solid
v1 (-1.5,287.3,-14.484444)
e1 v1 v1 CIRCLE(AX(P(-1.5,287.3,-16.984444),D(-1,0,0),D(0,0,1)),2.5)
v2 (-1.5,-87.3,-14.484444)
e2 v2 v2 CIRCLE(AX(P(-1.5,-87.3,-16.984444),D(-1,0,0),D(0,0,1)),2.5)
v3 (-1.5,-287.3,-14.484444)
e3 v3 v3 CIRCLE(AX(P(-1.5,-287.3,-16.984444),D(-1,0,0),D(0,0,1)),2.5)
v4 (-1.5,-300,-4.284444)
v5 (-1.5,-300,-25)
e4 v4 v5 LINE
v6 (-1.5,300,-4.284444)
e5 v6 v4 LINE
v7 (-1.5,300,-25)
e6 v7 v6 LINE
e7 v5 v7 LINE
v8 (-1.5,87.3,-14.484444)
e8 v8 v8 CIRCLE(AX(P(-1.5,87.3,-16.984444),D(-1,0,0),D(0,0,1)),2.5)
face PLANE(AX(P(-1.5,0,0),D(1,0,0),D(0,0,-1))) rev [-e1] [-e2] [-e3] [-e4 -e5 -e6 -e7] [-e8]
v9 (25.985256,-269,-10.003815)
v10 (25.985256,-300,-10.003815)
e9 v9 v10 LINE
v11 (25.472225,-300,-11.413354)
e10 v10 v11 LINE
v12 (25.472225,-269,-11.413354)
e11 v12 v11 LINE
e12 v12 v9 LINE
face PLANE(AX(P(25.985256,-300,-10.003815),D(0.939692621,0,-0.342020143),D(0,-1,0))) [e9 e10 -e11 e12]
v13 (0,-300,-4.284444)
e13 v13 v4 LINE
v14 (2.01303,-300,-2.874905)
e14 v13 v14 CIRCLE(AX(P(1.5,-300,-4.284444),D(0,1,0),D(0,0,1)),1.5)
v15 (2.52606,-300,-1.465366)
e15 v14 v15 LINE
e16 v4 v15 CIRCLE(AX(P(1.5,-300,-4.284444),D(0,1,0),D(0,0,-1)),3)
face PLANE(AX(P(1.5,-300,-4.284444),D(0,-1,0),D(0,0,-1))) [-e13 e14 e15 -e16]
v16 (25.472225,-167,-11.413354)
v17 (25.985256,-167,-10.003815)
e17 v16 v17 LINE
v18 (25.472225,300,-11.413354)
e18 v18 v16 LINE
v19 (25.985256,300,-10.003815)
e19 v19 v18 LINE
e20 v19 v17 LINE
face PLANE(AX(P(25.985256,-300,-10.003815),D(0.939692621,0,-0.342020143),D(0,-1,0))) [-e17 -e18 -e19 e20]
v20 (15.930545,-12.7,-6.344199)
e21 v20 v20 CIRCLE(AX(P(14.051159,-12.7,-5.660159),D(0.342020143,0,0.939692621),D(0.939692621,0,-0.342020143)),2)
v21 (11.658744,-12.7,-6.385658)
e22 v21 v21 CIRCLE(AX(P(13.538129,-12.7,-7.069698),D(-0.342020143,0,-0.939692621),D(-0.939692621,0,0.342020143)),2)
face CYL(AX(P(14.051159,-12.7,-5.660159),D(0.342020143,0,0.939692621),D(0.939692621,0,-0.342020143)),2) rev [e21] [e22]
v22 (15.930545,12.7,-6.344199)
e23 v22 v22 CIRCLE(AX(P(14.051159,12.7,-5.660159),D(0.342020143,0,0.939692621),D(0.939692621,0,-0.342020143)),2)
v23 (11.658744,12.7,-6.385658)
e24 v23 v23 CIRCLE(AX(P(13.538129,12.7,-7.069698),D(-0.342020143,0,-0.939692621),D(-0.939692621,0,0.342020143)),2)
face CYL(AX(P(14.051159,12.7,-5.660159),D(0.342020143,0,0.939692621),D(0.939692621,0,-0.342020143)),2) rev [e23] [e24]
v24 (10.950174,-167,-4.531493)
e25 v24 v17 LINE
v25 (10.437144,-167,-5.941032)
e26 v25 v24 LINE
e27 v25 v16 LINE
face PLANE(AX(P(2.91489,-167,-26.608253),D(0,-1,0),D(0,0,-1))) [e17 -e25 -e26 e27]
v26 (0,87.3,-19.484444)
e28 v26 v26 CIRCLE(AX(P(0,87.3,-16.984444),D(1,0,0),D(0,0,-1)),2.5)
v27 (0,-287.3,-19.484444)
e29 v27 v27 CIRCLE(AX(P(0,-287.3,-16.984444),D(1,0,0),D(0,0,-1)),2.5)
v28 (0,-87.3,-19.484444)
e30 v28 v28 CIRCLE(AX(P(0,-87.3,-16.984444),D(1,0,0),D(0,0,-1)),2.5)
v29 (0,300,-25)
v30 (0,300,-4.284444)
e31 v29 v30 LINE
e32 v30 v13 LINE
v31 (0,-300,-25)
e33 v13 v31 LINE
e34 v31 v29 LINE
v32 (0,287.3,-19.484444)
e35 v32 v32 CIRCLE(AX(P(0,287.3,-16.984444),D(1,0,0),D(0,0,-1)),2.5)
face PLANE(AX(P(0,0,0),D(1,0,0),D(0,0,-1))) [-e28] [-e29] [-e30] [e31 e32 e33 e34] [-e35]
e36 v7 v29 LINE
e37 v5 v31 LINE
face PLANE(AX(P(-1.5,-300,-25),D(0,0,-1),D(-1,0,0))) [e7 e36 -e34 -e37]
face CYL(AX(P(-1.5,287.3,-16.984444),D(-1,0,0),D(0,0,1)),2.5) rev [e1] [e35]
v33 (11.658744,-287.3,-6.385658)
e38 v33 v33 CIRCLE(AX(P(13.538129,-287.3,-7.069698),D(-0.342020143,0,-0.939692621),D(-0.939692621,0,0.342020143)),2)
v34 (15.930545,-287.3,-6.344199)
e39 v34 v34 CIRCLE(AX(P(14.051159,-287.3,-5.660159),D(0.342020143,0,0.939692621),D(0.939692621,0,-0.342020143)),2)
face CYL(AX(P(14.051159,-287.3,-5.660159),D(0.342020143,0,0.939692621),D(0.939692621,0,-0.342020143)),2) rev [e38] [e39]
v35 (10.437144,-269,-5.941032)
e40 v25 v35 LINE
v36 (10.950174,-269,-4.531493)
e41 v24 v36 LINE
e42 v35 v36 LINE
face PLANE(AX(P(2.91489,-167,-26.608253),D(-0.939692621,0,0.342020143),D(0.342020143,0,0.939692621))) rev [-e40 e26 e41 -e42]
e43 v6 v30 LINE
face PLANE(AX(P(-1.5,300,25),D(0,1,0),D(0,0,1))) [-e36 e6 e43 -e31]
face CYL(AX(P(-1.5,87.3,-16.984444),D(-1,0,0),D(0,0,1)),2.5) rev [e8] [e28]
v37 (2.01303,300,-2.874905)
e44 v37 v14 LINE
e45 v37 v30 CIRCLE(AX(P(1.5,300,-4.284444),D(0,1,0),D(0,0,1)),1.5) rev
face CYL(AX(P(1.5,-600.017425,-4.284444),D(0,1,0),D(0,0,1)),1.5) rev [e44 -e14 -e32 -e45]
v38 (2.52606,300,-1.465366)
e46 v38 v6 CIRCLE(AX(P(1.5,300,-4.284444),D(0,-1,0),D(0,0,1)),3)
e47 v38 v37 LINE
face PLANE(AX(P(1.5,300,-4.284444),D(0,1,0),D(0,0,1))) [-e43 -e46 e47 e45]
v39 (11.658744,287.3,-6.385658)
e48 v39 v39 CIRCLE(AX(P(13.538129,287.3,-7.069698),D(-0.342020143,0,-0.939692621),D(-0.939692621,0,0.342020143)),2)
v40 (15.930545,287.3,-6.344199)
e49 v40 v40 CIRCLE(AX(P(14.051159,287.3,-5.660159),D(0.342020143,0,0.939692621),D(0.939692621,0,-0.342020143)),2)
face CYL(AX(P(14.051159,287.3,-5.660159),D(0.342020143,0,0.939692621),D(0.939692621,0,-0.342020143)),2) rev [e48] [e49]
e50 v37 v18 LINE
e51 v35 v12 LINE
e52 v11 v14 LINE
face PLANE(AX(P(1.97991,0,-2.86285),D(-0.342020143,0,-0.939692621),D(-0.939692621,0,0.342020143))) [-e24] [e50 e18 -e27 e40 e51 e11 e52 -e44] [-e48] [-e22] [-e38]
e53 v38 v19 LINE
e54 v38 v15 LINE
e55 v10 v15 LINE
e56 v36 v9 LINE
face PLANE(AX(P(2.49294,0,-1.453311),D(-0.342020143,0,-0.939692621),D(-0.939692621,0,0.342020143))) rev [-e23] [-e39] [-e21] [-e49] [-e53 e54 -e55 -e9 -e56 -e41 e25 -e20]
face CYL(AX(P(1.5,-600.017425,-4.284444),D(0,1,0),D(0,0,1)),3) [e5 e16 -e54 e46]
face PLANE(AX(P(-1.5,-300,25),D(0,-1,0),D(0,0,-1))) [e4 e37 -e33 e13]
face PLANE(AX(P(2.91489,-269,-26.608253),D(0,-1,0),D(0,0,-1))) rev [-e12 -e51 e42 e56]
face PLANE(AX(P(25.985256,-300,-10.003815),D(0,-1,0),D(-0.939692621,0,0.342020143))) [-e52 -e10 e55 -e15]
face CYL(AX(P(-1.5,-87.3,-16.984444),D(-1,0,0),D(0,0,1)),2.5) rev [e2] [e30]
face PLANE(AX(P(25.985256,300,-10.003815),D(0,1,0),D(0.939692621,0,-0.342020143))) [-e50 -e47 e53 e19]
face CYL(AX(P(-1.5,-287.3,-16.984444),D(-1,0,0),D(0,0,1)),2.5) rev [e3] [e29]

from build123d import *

# Parameters (mm, degrees)
SKETCH1_W                = 600
SKETCH1_H                = 50
BASE_FLANGE1_DEPTH       = 1.5
SKETCHED_START           = -300
SKETCHED_BEND2_DEPTH     = 600
SKETCHED_BEND2_2_DEPTH   = 600
F_4_0_4_DIAMETER_HOLE1_D = 4
F_5_0_5_DIAMETER_HOLE1_D = 5
CUT_EXTRUDE1_REACH       = 304.135
SKETCH11_W               = 102
SKETCH11_H               = 16


# Read off the part's stored shape, not the designer's step: Sketched Bend2
# Sheet-metal steps are written as plain solids
with BuildPart() as part:
    # Sketch1 → Base-Flange1 (new body)
    with BuildSketch(Plane.YZ):
        Rectangle(SKETCH1_W, SKETCH1_H)
    extrude(amount=-BASE_FLANGE1_DEPTH)

    # Sketched Bend2 outline → Sketched Bend2 (cut)
    with BuildSketch(Plane(origin=(0, 0, 0), x_dir=(1, 0, 0), z_dir=(0, 1, 0)).offset(SKETCHED_START)):
        with BuildLine():
            Line((0, -25), (0, 1.686367809))
            ThreePointArc((0, 1.686367809), (-1.098076211, 2.78444402), (-1.5, 4.28444402))
            Line((-1.5, 4.28444402), (-1.5, -25))
            Line((-1.5, -25), (0, -25))
        make_face()
    extrude(amount=SKETCHED_BEND2_DEPTH, mode=Mode.SUBTRACT)

    # Sketched Bend2 2 outline → Sketched Bend2 2 (add)
    with BuildSketch(Plane(origin=(0, 0, 0), x_dir=(1, 0, 0), z_dir=(0, 1, 0)).offset(SKETCHED_START)):
        with BuildLine():
            Line((2.52606043, 1.465366158), (25.985255658, 10.003814941))
            Line((25.985255658, 10.003814941), (25.472225443, 11.413353872))
            Line((25.472225443, 11.413353872), (2.013030215, 2.874905089))
            ThreePointArc((2.013030215, 2.874905089), (0.639635346, 3.055715954), (0, 4.28444402))
            Line((0, 4.28444402), (0, 1.686367809))
            ThreePointArc((0, 1.686367809), (1.238532772, 1.295859926), (2.52606043, 1.465366158))
        make_face()
    extrude(amount=SKETCHED_BEND2_2_DEPTH)

    # Ø4.0 (4) Diameter Hole1 (through all)
    with Locations(Plane(origin=(-0.175466668, 0, -0.482090707), x_dir=(0, -1, 0), z_dir=(0.3420201433256727, 0, 0.9396926207859071))):
        with Locations((287.3, 15.139659211), (12.7, 15.139659211)):
            f_4_0_4_diameter_hole1 = Hole(F_4_0_4_DIAMETER_HOLE1_D / 2)

    # Mirror1: Ø4.0 (4) Diameter Hole1 across plane
    add(f_4_0_4_diameter_hole1.mirror(Plane.ZX), mode=Mode.SUBTRACT)

    # Ø5.0 (5) Diameter Hole1 (through all)
    with Locations(Plane(origin=(-1.5, 0, 0), x_dir=(0, -1, 0), z_dir=(-1, 0, 0))):
        with Locations((-287.3, -16.98444402), (-87.3, -16.98444402), (87.3, -16.98444402), (287.3, -16.98444402)):
            Hole(F_5_0_5_DIAMETER_HOLE1_D / 2)

    # Sketch11 → Cut-Extrude1 (cut, up to next)
    with BuildSketch(Plane(origin=(-0.175466668, 0, -0.482090707), x_dir=(0, -1, 0), z_dir=(0.3420201433256727, 0, 0.9396926207859071)), mode=Mode.PRIVATE) as cut_extrude1_sk1:
        with Locations((218, 19.839659211)):
            Rectangle(SKETCH11_W, SKETCH11_H)
    cut_extrude1_tool1 = extrude(cut_extrude1_sk1.sketch, amount=-CUT_EXTRUDE1_REACH, mode=Mode.PRIVATE) & part.part
    add(cut_extrude1_tool1.solids().sort_by_distance((18.467715, -218, -7.267654))[0], mode=Mode.SUBTRACT)


solid = part.part
